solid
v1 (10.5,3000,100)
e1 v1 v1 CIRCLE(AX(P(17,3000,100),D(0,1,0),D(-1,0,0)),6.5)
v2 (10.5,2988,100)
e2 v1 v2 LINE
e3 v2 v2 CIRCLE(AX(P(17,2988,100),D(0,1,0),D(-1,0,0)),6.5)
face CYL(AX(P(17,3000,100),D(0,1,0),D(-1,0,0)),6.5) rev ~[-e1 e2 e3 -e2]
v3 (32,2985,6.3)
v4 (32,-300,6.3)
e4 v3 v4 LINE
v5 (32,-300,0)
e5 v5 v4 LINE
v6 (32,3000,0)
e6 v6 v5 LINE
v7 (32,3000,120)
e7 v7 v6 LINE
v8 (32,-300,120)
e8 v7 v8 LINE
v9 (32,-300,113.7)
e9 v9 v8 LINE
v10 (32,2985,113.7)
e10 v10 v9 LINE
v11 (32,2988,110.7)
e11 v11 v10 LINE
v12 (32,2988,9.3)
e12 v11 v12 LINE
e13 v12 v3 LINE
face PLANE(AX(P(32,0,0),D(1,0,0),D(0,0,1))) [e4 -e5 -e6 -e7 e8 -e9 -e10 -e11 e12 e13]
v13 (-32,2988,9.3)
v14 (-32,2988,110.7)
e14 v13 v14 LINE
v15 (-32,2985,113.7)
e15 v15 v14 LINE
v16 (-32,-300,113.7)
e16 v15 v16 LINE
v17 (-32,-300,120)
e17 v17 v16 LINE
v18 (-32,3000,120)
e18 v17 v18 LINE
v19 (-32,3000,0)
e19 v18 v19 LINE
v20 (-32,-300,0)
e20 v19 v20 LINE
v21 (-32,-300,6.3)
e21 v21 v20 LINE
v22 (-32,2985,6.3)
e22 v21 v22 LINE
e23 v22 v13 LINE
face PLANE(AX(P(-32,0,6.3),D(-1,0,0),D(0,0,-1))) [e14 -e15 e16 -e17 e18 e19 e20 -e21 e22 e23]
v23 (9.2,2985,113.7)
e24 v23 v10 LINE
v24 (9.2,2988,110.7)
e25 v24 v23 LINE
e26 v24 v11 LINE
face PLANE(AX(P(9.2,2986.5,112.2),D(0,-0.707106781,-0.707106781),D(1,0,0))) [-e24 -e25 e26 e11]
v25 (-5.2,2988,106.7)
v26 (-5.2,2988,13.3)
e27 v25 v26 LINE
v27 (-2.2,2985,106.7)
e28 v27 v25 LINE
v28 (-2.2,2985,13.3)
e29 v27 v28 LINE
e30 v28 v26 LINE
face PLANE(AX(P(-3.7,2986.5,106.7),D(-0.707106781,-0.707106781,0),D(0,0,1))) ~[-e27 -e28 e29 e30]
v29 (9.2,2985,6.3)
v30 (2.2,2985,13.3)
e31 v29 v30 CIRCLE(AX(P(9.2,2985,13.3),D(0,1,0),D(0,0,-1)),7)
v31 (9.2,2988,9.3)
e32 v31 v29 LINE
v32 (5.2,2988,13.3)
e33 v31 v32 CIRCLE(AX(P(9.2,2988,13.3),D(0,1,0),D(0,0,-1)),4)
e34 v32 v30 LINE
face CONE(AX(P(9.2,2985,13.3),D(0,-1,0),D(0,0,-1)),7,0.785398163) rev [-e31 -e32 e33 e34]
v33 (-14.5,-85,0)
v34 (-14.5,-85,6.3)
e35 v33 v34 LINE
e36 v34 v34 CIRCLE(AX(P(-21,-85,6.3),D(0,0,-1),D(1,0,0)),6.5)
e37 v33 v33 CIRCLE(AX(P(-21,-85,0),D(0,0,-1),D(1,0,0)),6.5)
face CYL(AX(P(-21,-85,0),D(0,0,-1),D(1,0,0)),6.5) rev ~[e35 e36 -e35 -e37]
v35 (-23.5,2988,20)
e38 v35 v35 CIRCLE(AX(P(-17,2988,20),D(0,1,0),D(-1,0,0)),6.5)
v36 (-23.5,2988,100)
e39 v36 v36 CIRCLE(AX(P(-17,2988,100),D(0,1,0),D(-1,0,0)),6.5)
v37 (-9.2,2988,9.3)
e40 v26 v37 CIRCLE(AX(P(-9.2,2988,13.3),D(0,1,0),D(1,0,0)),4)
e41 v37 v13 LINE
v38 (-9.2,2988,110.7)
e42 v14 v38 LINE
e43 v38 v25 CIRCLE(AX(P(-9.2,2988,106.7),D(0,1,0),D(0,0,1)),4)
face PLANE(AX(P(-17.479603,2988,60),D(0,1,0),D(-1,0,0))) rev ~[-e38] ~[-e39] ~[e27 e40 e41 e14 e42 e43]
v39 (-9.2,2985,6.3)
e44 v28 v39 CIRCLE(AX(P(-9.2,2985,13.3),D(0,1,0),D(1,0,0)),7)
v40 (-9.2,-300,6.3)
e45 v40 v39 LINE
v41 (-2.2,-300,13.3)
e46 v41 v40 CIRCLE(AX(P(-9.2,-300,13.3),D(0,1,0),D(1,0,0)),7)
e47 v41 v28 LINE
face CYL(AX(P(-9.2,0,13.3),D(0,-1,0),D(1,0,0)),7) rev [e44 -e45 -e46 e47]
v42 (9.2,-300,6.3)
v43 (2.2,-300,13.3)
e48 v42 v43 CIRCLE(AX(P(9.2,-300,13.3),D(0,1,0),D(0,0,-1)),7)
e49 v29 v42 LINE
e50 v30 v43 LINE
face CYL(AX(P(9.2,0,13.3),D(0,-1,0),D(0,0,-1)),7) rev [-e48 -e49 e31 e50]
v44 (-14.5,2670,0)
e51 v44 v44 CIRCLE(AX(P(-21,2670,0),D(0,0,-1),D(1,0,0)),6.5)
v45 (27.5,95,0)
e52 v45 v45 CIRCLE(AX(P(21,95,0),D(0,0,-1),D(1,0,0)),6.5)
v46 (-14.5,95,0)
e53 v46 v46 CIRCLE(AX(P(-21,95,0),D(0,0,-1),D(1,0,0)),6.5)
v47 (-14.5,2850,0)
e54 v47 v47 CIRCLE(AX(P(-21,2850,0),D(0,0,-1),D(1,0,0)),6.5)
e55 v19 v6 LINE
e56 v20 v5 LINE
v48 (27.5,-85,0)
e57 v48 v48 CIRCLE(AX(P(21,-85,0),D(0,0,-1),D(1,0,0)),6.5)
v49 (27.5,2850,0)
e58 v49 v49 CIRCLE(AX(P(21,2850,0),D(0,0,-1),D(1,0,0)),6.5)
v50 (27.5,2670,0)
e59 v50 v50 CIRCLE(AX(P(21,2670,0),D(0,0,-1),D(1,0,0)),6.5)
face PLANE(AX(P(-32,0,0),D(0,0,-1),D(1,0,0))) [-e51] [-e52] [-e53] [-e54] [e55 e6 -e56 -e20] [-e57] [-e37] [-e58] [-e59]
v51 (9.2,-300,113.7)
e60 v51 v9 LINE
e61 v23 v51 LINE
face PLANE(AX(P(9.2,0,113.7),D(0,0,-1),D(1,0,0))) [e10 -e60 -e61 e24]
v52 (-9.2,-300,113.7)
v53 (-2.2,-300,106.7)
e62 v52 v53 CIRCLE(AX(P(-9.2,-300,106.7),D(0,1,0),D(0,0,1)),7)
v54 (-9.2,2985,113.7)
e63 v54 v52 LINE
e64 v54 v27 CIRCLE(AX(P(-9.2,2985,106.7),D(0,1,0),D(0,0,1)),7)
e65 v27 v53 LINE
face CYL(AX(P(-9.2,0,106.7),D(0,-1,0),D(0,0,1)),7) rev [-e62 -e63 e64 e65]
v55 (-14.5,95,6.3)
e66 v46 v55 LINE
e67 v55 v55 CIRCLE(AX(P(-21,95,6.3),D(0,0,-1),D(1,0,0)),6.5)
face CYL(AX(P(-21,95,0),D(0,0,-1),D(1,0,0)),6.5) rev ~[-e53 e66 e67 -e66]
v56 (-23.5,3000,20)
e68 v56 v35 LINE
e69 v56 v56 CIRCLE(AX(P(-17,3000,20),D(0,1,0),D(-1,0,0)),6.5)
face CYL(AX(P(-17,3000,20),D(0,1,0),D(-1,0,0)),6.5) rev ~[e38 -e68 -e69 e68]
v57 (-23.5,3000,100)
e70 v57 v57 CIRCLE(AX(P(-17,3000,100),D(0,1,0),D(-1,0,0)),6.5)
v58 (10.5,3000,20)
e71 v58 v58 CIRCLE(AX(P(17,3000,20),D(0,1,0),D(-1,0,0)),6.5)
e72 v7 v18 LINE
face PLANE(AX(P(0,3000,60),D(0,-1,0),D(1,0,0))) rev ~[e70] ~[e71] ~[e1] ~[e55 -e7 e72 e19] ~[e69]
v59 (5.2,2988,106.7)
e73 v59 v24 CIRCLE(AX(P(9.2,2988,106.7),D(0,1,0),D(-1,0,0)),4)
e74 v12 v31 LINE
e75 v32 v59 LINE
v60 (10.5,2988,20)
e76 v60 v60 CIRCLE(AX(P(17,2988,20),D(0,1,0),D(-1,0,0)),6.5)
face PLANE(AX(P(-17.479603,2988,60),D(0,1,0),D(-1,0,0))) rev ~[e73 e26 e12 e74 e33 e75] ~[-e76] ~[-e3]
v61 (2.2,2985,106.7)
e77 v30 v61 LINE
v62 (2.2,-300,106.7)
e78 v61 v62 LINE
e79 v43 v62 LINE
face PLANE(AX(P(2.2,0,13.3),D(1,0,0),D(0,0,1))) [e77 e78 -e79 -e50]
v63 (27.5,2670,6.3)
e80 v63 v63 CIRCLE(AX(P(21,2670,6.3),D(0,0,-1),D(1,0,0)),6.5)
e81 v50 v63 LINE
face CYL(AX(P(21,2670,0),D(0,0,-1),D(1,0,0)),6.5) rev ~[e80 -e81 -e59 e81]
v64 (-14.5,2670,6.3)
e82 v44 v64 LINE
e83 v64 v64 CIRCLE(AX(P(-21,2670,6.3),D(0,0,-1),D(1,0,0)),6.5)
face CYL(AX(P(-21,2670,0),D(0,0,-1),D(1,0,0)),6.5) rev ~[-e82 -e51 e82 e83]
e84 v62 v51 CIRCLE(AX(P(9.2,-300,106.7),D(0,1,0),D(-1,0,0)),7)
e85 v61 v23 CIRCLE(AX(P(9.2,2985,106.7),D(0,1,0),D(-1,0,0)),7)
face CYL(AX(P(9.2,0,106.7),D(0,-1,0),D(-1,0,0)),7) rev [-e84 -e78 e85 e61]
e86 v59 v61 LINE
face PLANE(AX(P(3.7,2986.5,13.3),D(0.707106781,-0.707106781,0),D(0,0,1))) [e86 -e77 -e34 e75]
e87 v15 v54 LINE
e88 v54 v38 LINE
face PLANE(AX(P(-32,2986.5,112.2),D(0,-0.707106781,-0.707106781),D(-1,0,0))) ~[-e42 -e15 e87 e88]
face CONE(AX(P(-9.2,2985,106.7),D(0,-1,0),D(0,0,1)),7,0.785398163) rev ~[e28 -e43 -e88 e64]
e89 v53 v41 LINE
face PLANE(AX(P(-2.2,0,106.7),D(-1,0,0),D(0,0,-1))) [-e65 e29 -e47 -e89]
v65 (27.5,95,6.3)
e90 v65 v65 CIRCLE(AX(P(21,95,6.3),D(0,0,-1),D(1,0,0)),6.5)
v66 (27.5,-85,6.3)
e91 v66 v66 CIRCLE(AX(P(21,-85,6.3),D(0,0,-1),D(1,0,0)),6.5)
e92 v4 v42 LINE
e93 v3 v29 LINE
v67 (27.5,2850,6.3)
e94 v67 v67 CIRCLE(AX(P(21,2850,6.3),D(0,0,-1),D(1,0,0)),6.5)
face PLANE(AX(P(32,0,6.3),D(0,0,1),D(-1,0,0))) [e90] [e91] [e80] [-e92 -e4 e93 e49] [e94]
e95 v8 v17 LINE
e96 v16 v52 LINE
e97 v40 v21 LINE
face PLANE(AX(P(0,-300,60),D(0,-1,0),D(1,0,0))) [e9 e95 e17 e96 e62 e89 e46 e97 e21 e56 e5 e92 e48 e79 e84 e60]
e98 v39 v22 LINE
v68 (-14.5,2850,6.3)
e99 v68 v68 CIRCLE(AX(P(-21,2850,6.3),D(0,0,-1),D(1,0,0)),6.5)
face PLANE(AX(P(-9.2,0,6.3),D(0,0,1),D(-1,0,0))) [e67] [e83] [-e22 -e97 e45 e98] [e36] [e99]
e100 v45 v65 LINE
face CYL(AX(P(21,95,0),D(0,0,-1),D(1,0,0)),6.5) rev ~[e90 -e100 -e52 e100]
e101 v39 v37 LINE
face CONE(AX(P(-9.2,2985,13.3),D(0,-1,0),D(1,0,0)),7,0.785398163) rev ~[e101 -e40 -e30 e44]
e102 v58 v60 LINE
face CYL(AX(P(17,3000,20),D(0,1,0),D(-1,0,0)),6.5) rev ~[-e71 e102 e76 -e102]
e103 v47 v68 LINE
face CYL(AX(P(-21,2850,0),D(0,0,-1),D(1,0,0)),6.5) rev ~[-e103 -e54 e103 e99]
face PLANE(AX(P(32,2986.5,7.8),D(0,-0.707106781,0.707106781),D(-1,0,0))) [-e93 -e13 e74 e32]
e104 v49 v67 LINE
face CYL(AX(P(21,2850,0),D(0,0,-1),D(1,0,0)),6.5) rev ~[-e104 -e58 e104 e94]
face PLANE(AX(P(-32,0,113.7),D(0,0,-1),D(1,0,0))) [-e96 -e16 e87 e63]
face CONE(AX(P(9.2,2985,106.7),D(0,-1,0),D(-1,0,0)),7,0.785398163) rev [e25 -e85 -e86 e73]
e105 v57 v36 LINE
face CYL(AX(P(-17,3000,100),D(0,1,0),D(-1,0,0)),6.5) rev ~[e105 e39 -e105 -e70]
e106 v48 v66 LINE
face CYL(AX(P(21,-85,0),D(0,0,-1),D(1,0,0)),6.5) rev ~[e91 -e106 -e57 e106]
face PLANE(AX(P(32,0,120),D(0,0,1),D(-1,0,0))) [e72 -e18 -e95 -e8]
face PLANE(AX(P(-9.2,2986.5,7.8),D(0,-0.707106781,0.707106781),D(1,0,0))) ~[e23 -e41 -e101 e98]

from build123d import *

# Parameters (mm, degrees)
F1_DEPTH      = 300
F1_DEPTH_BACK = 3000
F2_R          = 6.5
F3_DEPTH      = 12
F4_SIZE       = 3
F5_SIZE       = 3
F6_R          = 6.5
F7_DEPTH      = 6.3


# Not quite as in the source:
# - a feature names something its author has since deleted; it is built from what else it names


with BuildPart() as f1:
    # F0 (on Front) → F1 (new body, two sides)
    with BuildSketch(Plane.XZ) as f1_sk:
        with BuildLine():
            Line((-32, 6.3), (-32, 0))
            Line((-32, 0), (32, 0))
            Line((32, 0), (32, 6.3))
            Line((32, 6.3), (9.2, 6.3))
            ThreePointArc((9.2, 6.3), (4.2502525317, 8.3502525317), (2.2, 13.3))
            Line((2.2, 13.3), (2.2, 106.7))
            ThreePointArc((2.2, 106.7), (4.2502525317, 111.6497474683), (9.2, 113.7))
            Line((9.2, 113.7), (32, 113.7))
            Line((32, 113.7), (32, 120))
            Line((32, 120), (-32, 120))
            Line((-32, 120), (-32, 113.7))
            Line((-32, 113.7), (-9.2, 113.7))
            ThreePointArc((-9.2, 113.7), (-4.2502525317, 111.6497474683), (-2.2, 106.7))
            Line((-2.2, 106.7), (-2.2, 13.3))
            ThreePointArc((-2.2, 13.3), (-4.2502525317, 8.3502525317), (-9.2, 6.3))
            Line((-9.2, 6.3), (-32, 6.3))
        make_face()
    extrude(amount=F1_DEPTH)
    extrude(f1_sk.sketch, amount=-F1_DEPTH_BACK)

    # F2 (on face) → F3 (join)
    with BuildSketch(Plane(origin=(0, 3000, 0), x_dir=(-1, 0, 0), z_dir=(0, 1, 0))):
        with BuildLine():
            Line((9.2, 6.3), (32, 6.3))
            Line((32, 6.3), (32, 113.7))
            Line((32, 113.7), (9.2, 113.7))
            ThreePointArc((9.2, 113.7), (4.2502525317, 111.6497474683), (2.2, 106.7))
            Line((2.2, 106.7), (2.2, 13.3))
            ThreePointArc((2.2, 13.3), (4.2502525317, 8.3502525317), (9.2, 6.3))
        make_face()
        with Locations((17, 20)):
            Circle(F2_R, mode=Mode.SUBTRACT)
        with Locations((17, 100)):
            Circle(F2_R, mode=Mode.SUBTRACT)
        with BuildLine():
            Line((-32, 113.7), (-32, 6.3))
            Line((-32, 6.3), (-9.2, 6.3))
            ThreePointArc((-9.2, 6.3), (-4.2502525317, 8.3502525317), (-2.2, 13.3))
            Line((-2.2, 13.3), (-2.2, 106.7))
            ThreePointArc((-2.2, 106.7), (-4.2502525317, 111.6497474683), (-9.2, 113.7))
            Line((-9.2, 113.7), (-32, 113.7))
        make_face()
        with Locations((-17, 20)):
            Circle(F2_R, mode=Mode.SUBTRACT)
        with Locations((-17, 100)):
            Circle(F2_R, mode=Mode.SUBTRACT)
        with BuildLine():
            Line((-32, 6.3), (-32, 0))
            Line((-32, 0), (32, 0))
            Line((32, 0), (32, 6.3))
            Line((32, 6.3), (9.2, 6.3))
            ThreePointArc((9.2, 6.3), (4.2502525317, 8.3502525317), (2.2, 13.3))
            Line((2.2, 13.3), (2.2, 106.7))
            ThreePointArc((2.2, 106.7), (4.2502525317, 111.6497474683), (9.2, 113.7))
            Line((9.2, 113.7), (32, 113.7))
            Line((32, 113.7), (32, 120))
            Line((32, 120), (-32, 120))
            Line((-32, 120), (-32, 113.7))
            Line((-32, 113.7), (-9.2, 113.7))
            ThreePointArc((-9.2, 113.7), (-4.2502525317, 111.6497474683), (-2.2, 106.7))
            Line((-2.2, 106.7), (-2.2, 13.3))
            ThreePointArc((-2.2, 13.3), (-4.2502525317, 8.3502525317), (-9.2, 6.3))
            Line((-9.2, 6.3), (-32, 6.3))
        make_face()
    extrude(amount=-F3_DEPTH)

    # F4
    f4_edges = [f1.edges().sort_by_distance(p)[0] for p in [
        (20.6, 2988, 113.7),
        (4.250253, 2988, 111.649747),
        (2.2, 2988, 60),
        (4.250253, 2988, 8.350253),
        (20.6, 2988, 6.3),
    ]]
    chamfer(f4_edges, length=F4_SIZE)

    # F5
    f5_edges = [f1.edges().sort_by_distance(p)[0] for p in [
        (-20.6, 2988, 6.3),
        (-4.250253, 2988, 8.350253),
        (-2.2, 2988, 60),
        (-4.250253, 2988, 111.649747),
        (-20.6, 2988, 113.7),
    ]]
    chamfer(f5_edges, length=F5_SIZE)

    # F6 (on face) → F7 (cut, through all)
    with BuildSketch(Plane(origin=(0, 0, 0), x_dir=(1, 0, 0), z_dir=(0, 0, -1))):
        with Locations((21, 85)):
            Circle(F6_R)
        with Locations((-21, 85)):
            Circle(F6_R)
        with Locations((-21, -95)):
            Circle(F6_R)
        with Locations((21, -95)):
            Circle(F6_R)
        with Locations((-21, -2670)):
            Circle(F6_R)
        with Locations((21, -2670)):
            Circle(F6_R)
        with Locations((21, -2850)):
            Circle(F6_R)
        with Locations((-21, -2850)):
            Circle(F6_R)
    extrude(amount=-F7_DEPTH, mode=Mode.SUBTRACT)


solid = f1.part
